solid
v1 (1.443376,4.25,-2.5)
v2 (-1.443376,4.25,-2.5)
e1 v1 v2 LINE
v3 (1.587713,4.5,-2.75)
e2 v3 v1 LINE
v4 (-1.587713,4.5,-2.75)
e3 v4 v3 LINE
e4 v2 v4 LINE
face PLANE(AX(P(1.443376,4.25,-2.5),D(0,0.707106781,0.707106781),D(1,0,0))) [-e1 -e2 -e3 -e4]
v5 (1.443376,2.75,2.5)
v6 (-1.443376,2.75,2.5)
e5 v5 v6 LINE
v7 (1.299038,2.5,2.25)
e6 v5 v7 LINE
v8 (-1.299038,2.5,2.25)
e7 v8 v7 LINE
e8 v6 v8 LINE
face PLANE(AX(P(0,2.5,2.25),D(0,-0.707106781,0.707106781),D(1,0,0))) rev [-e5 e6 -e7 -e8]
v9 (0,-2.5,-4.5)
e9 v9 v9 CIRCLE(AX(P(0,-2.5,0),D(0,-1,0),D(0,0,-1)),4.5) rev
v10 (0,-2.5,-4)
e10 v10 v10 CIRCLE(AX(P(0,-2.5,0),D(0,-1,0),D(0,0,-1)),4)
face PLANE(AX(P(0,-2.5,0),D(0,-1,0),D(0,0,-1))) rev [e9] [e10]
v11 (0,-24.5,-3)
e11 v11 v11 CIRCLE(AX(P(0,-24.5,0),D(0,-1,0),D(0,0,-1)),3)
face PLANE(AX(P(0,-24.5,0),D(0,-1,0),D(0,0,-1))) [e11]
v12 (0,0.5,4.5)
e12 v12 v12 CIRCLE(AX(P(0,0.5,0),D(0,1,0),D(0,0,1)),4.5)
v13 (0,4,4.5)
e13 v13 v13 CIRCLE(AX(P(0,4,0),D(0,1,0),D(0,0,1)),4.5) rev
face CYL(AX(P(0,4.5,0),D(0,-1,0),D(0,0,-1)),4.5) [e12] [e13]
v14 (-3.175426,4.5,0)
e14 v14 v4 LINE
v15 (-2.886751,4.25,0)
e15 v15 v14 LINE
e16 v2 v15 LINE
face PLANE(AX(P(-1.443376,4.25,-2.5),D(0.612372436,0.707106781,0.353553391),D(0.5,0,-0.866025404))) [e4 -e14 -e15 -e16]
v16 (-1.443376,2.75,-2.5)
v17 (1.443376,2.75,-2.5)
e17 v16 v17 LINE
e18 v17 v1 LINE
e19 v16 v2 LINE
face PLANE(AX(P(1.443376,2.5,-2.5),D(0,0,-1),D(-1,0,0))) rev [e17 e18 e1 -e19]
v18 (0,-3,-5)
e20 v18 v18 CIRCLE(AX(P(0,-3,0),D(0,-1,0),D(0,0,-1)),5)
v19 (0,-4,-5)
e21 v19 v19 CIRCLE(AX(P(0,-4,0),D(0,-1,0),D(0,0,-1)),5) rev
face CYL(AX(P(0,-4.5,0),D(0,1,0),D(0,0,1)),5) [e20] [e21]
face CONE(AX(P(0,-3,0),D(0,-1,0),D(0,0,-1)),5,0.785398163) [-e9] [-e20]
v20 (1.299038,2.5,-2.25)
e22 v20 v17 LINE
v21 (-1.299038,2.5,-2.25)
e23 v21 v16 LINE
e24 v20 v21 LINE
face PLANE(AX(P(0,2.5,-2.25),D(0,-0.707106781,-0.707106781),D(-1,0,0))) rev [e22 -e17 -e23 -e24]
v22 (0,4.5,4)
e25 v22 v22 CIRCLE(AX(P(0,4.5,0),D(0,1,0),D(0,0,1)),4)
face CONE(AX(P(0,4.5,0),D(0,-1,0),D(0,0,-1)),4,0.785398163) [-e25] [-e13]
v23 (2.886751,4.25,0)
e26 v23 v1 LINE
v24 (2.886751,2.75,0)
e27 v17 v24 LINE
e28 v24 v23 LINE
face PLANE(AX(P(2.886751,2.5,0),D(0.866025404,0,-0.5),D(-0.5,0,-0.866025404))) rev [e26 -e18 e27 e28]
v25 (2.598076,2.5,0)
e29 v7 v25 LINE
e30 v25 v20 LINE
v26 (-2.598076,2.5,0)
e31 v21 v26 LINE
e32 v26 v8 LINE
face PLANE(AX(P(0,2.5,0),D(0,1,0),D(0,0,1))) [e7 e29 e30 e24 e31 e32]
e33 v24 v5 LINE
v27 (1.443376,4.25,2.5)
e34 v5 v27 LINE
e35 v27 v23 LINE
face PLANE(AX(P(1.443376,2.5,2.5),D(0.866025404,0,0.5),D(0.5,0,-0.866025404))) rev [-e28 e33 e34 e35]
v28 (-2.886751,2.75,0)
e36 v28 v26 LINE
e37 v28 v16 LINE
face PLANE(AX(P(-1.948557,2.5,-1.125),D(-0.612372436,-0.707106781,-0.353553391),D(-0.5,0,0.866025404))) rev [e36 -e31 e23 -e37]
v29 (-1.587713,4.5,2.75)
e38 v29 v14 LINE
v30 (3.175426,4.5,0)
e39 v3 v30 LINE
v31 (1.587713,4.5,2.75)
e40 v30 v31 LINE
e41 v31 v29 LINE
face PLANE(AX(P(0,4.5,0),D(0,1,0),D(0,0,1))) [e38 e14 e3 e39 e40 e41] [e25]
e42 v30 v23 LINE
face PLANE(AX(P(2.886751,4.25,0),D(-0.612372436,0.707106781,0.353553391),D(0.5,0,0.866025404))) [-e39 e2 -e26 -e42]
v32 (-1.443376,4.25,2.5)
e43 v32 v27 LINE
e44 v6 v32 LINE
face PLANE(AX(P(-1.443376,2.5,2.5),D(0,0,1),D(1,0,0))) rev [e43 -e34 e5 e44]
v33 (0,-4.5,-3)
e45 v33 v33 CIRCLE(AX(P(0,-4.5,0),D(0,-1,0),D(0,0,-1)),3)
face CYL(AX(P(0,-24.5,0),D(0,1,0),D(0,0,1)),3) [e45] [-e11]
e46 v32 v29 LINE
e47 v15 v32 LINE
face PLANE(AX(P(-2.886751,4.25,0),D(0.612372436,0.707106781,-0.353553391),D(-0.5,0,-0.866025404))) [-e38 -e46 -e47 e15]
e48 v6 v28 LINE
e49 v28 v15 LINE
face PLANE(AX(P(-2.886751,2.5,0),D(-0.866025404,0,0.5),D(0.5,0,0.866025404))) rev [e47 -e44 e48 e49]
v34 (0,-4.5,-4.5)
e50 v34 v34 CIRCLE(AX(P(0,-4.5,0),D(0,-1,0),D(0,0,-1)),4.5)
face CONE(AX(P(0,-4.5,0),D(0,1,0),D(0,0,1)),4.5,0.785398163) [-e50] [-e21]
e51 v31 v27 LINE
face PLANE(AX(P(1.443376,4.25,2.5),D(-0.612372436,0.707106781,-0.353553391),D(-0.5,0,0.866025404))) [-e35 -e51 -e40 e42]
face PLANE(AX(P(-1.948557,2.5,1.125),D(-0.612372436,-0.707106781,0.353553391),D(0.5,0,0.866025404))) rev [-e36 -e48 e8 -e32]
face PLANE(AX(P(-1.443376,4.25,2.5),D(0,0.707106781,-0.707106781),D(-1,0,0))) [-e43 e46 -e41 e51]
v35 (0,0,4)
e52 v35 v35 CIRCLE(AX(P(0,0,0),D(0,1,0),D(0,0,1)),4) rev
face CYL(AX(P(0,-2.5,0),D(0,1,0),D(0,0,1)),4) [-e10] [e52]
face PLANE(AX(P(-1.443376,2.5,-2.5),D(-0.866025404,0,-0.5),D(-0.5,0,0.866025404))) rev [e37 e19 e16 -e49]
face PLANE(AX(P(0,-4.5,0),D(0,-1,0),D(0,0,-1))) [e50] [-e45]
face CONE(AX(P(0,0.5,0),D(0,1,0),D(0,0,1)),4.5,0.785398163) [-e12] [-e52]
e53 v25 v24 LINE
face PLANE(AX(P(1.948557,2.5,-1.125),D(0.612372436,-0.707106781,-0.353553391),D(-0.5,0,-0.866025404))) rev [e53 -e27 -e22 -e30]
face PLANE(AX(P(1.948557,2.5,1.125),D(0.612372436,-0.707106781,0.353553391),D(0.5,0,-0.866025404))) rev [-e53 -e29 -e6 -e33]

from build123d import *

# Parameters (mm, degrees)
SKETCH_1_R          = 4.5
EXTRUDE_1_DEPTH     = 4.5
CUT_EXTRUDE_1_DEPTH = 2
SKETCH_3_R          = 4
EXTRUDE_2_DEPTH     = 2.5
SKETCH_4_R          = 5
EXTRUDE_3_DEPTH     = 2
SKETCH_5_R          = 3
EXTRUDE_4_DEPTH     = 20
CHAMFER_1_SIZE      = 0.5
CHAMFER_2_SIZE      = 0.5
CHAMFER_3_SIZE      = 0.5
CHAMFER_4_SIZE      = 0.25


with BuildPart() as part:
    # ｽｹｯﾁ1 → ﾎﾞｽ - 押し出し1 (new body)
    with BuildSketch(Plane(origin=(0, 0, 0), x_dir=(1, 0, 0), z_dir=(0, 1, 0))):
        with Locations(Location((0, 0, 0), (0, 0, 270))):
            Circle(SKETCH_1_R)
    extrude(amount=EXTRUDE_1_DEPTH)

    # ｽｹｯﾁ2 → ｶｯﾄ - 押し出し1 (cut)
    with BuildSketch(Plane(origin=(0, 4.5, 0), x_dir=(1, 0, 0), z_dir=(0, 1, 0))):
        Polygon((2.886751346, 0), (1.443375673, 2.5), (-1.443375673, 2.5), (-2.886751346, 0), (-1.443375673, -2.5), (1.443375673, -2.5), align=None)
    extrude(amount=-CUT_EXTRUDE_1_DEPTH, mode=Mode.SUBTRACT)

    # ｽｹｯﾁ3 → ﾎﾞｽ - 押し出し2 (add)
    with BuildSketch(Plane.XZ):
        with Locations(Location((0, 0, 0), (0, 0, 90))):
            Circle(SKETCH_3_R)
    extrude(amount=EXTRUDE_2_DEPTH)

    # ｽｹｯﾁ4 → ﾎﾞｽ - 押し出し3 (add)
    with BuildSketch(Plane.XZ.offset(2.5)):
        with Locations(Location((0, 0, 0), (0, 0, 270))):
            Circle(SKETCH_4_R)
    extrude(amount=EXTRUDE_3_DEPTH)

    # ｽｹｯﾁ5 → ﾎﾞｽ - 押し出し4 (add)
    with BuildSketch(Plane.XZ.offset(4.5)):
        with Locations(Location((0, 0, 0), (0, 0, 270))):
            Circle(SKETCH_5_R)
    extrude(amount=EXTRUDE_4_DEPTH)

    # 面取り1
    chamfer_1_edges = [part.edges().sort_by_distance(p)[0] for p in [
        (0, 4.5, -4.5),
    ]]
    chamfer(chamfer_1_edges, length=CHAMFER_1_SIZE)

    # 面取り2
    chamfer_2_edges = [part.edges().sort_by_distance(p)[0] for p in [
        (0, 0, -4.5),
    ]]
    chamfer(chamfer_2_edges, length=CHAMFER_2_SIZE - 0.0001)  # a hair under: the kernel refuses the full size

    # 面取り3
    chamfer_3_edges = [part.edges().sort_by_distance(p)[0] for p in [
        (0, -2.5, 5),
        (0, -4.5, 5),
    ]]
    chamfer(chamfer_3_edges, length=CHAMFER_3_SIZE)

    # 面取り4
    chamfer_4_edges = [part.edges().sort_by_distance(p)[0] for p in [
        (2.165063509, 2.5, -1.25),
        (2.165063509, 4.5, 1.25),
        (2.165063509, 4.5, -1.25),
        (0, 4.5, -2.5),
        (-2.165063509, 4.5, -1.25),
        (-2.165063509, 4.5, 1.25),
        (0, 4.5, 2.5),
        (2.165063509, 2.5, 1.25),
        (0, 2.5, 2.5),
        (-2.165063509, 2.5, 1.25),
        (-2.165063509, 2.5, -1.25),
        (0, 2.5, -2.5),
    ]]
    chamfer(chamfer_4_edges, length=CHAMFER_4_SIZE)


solid = part.part
